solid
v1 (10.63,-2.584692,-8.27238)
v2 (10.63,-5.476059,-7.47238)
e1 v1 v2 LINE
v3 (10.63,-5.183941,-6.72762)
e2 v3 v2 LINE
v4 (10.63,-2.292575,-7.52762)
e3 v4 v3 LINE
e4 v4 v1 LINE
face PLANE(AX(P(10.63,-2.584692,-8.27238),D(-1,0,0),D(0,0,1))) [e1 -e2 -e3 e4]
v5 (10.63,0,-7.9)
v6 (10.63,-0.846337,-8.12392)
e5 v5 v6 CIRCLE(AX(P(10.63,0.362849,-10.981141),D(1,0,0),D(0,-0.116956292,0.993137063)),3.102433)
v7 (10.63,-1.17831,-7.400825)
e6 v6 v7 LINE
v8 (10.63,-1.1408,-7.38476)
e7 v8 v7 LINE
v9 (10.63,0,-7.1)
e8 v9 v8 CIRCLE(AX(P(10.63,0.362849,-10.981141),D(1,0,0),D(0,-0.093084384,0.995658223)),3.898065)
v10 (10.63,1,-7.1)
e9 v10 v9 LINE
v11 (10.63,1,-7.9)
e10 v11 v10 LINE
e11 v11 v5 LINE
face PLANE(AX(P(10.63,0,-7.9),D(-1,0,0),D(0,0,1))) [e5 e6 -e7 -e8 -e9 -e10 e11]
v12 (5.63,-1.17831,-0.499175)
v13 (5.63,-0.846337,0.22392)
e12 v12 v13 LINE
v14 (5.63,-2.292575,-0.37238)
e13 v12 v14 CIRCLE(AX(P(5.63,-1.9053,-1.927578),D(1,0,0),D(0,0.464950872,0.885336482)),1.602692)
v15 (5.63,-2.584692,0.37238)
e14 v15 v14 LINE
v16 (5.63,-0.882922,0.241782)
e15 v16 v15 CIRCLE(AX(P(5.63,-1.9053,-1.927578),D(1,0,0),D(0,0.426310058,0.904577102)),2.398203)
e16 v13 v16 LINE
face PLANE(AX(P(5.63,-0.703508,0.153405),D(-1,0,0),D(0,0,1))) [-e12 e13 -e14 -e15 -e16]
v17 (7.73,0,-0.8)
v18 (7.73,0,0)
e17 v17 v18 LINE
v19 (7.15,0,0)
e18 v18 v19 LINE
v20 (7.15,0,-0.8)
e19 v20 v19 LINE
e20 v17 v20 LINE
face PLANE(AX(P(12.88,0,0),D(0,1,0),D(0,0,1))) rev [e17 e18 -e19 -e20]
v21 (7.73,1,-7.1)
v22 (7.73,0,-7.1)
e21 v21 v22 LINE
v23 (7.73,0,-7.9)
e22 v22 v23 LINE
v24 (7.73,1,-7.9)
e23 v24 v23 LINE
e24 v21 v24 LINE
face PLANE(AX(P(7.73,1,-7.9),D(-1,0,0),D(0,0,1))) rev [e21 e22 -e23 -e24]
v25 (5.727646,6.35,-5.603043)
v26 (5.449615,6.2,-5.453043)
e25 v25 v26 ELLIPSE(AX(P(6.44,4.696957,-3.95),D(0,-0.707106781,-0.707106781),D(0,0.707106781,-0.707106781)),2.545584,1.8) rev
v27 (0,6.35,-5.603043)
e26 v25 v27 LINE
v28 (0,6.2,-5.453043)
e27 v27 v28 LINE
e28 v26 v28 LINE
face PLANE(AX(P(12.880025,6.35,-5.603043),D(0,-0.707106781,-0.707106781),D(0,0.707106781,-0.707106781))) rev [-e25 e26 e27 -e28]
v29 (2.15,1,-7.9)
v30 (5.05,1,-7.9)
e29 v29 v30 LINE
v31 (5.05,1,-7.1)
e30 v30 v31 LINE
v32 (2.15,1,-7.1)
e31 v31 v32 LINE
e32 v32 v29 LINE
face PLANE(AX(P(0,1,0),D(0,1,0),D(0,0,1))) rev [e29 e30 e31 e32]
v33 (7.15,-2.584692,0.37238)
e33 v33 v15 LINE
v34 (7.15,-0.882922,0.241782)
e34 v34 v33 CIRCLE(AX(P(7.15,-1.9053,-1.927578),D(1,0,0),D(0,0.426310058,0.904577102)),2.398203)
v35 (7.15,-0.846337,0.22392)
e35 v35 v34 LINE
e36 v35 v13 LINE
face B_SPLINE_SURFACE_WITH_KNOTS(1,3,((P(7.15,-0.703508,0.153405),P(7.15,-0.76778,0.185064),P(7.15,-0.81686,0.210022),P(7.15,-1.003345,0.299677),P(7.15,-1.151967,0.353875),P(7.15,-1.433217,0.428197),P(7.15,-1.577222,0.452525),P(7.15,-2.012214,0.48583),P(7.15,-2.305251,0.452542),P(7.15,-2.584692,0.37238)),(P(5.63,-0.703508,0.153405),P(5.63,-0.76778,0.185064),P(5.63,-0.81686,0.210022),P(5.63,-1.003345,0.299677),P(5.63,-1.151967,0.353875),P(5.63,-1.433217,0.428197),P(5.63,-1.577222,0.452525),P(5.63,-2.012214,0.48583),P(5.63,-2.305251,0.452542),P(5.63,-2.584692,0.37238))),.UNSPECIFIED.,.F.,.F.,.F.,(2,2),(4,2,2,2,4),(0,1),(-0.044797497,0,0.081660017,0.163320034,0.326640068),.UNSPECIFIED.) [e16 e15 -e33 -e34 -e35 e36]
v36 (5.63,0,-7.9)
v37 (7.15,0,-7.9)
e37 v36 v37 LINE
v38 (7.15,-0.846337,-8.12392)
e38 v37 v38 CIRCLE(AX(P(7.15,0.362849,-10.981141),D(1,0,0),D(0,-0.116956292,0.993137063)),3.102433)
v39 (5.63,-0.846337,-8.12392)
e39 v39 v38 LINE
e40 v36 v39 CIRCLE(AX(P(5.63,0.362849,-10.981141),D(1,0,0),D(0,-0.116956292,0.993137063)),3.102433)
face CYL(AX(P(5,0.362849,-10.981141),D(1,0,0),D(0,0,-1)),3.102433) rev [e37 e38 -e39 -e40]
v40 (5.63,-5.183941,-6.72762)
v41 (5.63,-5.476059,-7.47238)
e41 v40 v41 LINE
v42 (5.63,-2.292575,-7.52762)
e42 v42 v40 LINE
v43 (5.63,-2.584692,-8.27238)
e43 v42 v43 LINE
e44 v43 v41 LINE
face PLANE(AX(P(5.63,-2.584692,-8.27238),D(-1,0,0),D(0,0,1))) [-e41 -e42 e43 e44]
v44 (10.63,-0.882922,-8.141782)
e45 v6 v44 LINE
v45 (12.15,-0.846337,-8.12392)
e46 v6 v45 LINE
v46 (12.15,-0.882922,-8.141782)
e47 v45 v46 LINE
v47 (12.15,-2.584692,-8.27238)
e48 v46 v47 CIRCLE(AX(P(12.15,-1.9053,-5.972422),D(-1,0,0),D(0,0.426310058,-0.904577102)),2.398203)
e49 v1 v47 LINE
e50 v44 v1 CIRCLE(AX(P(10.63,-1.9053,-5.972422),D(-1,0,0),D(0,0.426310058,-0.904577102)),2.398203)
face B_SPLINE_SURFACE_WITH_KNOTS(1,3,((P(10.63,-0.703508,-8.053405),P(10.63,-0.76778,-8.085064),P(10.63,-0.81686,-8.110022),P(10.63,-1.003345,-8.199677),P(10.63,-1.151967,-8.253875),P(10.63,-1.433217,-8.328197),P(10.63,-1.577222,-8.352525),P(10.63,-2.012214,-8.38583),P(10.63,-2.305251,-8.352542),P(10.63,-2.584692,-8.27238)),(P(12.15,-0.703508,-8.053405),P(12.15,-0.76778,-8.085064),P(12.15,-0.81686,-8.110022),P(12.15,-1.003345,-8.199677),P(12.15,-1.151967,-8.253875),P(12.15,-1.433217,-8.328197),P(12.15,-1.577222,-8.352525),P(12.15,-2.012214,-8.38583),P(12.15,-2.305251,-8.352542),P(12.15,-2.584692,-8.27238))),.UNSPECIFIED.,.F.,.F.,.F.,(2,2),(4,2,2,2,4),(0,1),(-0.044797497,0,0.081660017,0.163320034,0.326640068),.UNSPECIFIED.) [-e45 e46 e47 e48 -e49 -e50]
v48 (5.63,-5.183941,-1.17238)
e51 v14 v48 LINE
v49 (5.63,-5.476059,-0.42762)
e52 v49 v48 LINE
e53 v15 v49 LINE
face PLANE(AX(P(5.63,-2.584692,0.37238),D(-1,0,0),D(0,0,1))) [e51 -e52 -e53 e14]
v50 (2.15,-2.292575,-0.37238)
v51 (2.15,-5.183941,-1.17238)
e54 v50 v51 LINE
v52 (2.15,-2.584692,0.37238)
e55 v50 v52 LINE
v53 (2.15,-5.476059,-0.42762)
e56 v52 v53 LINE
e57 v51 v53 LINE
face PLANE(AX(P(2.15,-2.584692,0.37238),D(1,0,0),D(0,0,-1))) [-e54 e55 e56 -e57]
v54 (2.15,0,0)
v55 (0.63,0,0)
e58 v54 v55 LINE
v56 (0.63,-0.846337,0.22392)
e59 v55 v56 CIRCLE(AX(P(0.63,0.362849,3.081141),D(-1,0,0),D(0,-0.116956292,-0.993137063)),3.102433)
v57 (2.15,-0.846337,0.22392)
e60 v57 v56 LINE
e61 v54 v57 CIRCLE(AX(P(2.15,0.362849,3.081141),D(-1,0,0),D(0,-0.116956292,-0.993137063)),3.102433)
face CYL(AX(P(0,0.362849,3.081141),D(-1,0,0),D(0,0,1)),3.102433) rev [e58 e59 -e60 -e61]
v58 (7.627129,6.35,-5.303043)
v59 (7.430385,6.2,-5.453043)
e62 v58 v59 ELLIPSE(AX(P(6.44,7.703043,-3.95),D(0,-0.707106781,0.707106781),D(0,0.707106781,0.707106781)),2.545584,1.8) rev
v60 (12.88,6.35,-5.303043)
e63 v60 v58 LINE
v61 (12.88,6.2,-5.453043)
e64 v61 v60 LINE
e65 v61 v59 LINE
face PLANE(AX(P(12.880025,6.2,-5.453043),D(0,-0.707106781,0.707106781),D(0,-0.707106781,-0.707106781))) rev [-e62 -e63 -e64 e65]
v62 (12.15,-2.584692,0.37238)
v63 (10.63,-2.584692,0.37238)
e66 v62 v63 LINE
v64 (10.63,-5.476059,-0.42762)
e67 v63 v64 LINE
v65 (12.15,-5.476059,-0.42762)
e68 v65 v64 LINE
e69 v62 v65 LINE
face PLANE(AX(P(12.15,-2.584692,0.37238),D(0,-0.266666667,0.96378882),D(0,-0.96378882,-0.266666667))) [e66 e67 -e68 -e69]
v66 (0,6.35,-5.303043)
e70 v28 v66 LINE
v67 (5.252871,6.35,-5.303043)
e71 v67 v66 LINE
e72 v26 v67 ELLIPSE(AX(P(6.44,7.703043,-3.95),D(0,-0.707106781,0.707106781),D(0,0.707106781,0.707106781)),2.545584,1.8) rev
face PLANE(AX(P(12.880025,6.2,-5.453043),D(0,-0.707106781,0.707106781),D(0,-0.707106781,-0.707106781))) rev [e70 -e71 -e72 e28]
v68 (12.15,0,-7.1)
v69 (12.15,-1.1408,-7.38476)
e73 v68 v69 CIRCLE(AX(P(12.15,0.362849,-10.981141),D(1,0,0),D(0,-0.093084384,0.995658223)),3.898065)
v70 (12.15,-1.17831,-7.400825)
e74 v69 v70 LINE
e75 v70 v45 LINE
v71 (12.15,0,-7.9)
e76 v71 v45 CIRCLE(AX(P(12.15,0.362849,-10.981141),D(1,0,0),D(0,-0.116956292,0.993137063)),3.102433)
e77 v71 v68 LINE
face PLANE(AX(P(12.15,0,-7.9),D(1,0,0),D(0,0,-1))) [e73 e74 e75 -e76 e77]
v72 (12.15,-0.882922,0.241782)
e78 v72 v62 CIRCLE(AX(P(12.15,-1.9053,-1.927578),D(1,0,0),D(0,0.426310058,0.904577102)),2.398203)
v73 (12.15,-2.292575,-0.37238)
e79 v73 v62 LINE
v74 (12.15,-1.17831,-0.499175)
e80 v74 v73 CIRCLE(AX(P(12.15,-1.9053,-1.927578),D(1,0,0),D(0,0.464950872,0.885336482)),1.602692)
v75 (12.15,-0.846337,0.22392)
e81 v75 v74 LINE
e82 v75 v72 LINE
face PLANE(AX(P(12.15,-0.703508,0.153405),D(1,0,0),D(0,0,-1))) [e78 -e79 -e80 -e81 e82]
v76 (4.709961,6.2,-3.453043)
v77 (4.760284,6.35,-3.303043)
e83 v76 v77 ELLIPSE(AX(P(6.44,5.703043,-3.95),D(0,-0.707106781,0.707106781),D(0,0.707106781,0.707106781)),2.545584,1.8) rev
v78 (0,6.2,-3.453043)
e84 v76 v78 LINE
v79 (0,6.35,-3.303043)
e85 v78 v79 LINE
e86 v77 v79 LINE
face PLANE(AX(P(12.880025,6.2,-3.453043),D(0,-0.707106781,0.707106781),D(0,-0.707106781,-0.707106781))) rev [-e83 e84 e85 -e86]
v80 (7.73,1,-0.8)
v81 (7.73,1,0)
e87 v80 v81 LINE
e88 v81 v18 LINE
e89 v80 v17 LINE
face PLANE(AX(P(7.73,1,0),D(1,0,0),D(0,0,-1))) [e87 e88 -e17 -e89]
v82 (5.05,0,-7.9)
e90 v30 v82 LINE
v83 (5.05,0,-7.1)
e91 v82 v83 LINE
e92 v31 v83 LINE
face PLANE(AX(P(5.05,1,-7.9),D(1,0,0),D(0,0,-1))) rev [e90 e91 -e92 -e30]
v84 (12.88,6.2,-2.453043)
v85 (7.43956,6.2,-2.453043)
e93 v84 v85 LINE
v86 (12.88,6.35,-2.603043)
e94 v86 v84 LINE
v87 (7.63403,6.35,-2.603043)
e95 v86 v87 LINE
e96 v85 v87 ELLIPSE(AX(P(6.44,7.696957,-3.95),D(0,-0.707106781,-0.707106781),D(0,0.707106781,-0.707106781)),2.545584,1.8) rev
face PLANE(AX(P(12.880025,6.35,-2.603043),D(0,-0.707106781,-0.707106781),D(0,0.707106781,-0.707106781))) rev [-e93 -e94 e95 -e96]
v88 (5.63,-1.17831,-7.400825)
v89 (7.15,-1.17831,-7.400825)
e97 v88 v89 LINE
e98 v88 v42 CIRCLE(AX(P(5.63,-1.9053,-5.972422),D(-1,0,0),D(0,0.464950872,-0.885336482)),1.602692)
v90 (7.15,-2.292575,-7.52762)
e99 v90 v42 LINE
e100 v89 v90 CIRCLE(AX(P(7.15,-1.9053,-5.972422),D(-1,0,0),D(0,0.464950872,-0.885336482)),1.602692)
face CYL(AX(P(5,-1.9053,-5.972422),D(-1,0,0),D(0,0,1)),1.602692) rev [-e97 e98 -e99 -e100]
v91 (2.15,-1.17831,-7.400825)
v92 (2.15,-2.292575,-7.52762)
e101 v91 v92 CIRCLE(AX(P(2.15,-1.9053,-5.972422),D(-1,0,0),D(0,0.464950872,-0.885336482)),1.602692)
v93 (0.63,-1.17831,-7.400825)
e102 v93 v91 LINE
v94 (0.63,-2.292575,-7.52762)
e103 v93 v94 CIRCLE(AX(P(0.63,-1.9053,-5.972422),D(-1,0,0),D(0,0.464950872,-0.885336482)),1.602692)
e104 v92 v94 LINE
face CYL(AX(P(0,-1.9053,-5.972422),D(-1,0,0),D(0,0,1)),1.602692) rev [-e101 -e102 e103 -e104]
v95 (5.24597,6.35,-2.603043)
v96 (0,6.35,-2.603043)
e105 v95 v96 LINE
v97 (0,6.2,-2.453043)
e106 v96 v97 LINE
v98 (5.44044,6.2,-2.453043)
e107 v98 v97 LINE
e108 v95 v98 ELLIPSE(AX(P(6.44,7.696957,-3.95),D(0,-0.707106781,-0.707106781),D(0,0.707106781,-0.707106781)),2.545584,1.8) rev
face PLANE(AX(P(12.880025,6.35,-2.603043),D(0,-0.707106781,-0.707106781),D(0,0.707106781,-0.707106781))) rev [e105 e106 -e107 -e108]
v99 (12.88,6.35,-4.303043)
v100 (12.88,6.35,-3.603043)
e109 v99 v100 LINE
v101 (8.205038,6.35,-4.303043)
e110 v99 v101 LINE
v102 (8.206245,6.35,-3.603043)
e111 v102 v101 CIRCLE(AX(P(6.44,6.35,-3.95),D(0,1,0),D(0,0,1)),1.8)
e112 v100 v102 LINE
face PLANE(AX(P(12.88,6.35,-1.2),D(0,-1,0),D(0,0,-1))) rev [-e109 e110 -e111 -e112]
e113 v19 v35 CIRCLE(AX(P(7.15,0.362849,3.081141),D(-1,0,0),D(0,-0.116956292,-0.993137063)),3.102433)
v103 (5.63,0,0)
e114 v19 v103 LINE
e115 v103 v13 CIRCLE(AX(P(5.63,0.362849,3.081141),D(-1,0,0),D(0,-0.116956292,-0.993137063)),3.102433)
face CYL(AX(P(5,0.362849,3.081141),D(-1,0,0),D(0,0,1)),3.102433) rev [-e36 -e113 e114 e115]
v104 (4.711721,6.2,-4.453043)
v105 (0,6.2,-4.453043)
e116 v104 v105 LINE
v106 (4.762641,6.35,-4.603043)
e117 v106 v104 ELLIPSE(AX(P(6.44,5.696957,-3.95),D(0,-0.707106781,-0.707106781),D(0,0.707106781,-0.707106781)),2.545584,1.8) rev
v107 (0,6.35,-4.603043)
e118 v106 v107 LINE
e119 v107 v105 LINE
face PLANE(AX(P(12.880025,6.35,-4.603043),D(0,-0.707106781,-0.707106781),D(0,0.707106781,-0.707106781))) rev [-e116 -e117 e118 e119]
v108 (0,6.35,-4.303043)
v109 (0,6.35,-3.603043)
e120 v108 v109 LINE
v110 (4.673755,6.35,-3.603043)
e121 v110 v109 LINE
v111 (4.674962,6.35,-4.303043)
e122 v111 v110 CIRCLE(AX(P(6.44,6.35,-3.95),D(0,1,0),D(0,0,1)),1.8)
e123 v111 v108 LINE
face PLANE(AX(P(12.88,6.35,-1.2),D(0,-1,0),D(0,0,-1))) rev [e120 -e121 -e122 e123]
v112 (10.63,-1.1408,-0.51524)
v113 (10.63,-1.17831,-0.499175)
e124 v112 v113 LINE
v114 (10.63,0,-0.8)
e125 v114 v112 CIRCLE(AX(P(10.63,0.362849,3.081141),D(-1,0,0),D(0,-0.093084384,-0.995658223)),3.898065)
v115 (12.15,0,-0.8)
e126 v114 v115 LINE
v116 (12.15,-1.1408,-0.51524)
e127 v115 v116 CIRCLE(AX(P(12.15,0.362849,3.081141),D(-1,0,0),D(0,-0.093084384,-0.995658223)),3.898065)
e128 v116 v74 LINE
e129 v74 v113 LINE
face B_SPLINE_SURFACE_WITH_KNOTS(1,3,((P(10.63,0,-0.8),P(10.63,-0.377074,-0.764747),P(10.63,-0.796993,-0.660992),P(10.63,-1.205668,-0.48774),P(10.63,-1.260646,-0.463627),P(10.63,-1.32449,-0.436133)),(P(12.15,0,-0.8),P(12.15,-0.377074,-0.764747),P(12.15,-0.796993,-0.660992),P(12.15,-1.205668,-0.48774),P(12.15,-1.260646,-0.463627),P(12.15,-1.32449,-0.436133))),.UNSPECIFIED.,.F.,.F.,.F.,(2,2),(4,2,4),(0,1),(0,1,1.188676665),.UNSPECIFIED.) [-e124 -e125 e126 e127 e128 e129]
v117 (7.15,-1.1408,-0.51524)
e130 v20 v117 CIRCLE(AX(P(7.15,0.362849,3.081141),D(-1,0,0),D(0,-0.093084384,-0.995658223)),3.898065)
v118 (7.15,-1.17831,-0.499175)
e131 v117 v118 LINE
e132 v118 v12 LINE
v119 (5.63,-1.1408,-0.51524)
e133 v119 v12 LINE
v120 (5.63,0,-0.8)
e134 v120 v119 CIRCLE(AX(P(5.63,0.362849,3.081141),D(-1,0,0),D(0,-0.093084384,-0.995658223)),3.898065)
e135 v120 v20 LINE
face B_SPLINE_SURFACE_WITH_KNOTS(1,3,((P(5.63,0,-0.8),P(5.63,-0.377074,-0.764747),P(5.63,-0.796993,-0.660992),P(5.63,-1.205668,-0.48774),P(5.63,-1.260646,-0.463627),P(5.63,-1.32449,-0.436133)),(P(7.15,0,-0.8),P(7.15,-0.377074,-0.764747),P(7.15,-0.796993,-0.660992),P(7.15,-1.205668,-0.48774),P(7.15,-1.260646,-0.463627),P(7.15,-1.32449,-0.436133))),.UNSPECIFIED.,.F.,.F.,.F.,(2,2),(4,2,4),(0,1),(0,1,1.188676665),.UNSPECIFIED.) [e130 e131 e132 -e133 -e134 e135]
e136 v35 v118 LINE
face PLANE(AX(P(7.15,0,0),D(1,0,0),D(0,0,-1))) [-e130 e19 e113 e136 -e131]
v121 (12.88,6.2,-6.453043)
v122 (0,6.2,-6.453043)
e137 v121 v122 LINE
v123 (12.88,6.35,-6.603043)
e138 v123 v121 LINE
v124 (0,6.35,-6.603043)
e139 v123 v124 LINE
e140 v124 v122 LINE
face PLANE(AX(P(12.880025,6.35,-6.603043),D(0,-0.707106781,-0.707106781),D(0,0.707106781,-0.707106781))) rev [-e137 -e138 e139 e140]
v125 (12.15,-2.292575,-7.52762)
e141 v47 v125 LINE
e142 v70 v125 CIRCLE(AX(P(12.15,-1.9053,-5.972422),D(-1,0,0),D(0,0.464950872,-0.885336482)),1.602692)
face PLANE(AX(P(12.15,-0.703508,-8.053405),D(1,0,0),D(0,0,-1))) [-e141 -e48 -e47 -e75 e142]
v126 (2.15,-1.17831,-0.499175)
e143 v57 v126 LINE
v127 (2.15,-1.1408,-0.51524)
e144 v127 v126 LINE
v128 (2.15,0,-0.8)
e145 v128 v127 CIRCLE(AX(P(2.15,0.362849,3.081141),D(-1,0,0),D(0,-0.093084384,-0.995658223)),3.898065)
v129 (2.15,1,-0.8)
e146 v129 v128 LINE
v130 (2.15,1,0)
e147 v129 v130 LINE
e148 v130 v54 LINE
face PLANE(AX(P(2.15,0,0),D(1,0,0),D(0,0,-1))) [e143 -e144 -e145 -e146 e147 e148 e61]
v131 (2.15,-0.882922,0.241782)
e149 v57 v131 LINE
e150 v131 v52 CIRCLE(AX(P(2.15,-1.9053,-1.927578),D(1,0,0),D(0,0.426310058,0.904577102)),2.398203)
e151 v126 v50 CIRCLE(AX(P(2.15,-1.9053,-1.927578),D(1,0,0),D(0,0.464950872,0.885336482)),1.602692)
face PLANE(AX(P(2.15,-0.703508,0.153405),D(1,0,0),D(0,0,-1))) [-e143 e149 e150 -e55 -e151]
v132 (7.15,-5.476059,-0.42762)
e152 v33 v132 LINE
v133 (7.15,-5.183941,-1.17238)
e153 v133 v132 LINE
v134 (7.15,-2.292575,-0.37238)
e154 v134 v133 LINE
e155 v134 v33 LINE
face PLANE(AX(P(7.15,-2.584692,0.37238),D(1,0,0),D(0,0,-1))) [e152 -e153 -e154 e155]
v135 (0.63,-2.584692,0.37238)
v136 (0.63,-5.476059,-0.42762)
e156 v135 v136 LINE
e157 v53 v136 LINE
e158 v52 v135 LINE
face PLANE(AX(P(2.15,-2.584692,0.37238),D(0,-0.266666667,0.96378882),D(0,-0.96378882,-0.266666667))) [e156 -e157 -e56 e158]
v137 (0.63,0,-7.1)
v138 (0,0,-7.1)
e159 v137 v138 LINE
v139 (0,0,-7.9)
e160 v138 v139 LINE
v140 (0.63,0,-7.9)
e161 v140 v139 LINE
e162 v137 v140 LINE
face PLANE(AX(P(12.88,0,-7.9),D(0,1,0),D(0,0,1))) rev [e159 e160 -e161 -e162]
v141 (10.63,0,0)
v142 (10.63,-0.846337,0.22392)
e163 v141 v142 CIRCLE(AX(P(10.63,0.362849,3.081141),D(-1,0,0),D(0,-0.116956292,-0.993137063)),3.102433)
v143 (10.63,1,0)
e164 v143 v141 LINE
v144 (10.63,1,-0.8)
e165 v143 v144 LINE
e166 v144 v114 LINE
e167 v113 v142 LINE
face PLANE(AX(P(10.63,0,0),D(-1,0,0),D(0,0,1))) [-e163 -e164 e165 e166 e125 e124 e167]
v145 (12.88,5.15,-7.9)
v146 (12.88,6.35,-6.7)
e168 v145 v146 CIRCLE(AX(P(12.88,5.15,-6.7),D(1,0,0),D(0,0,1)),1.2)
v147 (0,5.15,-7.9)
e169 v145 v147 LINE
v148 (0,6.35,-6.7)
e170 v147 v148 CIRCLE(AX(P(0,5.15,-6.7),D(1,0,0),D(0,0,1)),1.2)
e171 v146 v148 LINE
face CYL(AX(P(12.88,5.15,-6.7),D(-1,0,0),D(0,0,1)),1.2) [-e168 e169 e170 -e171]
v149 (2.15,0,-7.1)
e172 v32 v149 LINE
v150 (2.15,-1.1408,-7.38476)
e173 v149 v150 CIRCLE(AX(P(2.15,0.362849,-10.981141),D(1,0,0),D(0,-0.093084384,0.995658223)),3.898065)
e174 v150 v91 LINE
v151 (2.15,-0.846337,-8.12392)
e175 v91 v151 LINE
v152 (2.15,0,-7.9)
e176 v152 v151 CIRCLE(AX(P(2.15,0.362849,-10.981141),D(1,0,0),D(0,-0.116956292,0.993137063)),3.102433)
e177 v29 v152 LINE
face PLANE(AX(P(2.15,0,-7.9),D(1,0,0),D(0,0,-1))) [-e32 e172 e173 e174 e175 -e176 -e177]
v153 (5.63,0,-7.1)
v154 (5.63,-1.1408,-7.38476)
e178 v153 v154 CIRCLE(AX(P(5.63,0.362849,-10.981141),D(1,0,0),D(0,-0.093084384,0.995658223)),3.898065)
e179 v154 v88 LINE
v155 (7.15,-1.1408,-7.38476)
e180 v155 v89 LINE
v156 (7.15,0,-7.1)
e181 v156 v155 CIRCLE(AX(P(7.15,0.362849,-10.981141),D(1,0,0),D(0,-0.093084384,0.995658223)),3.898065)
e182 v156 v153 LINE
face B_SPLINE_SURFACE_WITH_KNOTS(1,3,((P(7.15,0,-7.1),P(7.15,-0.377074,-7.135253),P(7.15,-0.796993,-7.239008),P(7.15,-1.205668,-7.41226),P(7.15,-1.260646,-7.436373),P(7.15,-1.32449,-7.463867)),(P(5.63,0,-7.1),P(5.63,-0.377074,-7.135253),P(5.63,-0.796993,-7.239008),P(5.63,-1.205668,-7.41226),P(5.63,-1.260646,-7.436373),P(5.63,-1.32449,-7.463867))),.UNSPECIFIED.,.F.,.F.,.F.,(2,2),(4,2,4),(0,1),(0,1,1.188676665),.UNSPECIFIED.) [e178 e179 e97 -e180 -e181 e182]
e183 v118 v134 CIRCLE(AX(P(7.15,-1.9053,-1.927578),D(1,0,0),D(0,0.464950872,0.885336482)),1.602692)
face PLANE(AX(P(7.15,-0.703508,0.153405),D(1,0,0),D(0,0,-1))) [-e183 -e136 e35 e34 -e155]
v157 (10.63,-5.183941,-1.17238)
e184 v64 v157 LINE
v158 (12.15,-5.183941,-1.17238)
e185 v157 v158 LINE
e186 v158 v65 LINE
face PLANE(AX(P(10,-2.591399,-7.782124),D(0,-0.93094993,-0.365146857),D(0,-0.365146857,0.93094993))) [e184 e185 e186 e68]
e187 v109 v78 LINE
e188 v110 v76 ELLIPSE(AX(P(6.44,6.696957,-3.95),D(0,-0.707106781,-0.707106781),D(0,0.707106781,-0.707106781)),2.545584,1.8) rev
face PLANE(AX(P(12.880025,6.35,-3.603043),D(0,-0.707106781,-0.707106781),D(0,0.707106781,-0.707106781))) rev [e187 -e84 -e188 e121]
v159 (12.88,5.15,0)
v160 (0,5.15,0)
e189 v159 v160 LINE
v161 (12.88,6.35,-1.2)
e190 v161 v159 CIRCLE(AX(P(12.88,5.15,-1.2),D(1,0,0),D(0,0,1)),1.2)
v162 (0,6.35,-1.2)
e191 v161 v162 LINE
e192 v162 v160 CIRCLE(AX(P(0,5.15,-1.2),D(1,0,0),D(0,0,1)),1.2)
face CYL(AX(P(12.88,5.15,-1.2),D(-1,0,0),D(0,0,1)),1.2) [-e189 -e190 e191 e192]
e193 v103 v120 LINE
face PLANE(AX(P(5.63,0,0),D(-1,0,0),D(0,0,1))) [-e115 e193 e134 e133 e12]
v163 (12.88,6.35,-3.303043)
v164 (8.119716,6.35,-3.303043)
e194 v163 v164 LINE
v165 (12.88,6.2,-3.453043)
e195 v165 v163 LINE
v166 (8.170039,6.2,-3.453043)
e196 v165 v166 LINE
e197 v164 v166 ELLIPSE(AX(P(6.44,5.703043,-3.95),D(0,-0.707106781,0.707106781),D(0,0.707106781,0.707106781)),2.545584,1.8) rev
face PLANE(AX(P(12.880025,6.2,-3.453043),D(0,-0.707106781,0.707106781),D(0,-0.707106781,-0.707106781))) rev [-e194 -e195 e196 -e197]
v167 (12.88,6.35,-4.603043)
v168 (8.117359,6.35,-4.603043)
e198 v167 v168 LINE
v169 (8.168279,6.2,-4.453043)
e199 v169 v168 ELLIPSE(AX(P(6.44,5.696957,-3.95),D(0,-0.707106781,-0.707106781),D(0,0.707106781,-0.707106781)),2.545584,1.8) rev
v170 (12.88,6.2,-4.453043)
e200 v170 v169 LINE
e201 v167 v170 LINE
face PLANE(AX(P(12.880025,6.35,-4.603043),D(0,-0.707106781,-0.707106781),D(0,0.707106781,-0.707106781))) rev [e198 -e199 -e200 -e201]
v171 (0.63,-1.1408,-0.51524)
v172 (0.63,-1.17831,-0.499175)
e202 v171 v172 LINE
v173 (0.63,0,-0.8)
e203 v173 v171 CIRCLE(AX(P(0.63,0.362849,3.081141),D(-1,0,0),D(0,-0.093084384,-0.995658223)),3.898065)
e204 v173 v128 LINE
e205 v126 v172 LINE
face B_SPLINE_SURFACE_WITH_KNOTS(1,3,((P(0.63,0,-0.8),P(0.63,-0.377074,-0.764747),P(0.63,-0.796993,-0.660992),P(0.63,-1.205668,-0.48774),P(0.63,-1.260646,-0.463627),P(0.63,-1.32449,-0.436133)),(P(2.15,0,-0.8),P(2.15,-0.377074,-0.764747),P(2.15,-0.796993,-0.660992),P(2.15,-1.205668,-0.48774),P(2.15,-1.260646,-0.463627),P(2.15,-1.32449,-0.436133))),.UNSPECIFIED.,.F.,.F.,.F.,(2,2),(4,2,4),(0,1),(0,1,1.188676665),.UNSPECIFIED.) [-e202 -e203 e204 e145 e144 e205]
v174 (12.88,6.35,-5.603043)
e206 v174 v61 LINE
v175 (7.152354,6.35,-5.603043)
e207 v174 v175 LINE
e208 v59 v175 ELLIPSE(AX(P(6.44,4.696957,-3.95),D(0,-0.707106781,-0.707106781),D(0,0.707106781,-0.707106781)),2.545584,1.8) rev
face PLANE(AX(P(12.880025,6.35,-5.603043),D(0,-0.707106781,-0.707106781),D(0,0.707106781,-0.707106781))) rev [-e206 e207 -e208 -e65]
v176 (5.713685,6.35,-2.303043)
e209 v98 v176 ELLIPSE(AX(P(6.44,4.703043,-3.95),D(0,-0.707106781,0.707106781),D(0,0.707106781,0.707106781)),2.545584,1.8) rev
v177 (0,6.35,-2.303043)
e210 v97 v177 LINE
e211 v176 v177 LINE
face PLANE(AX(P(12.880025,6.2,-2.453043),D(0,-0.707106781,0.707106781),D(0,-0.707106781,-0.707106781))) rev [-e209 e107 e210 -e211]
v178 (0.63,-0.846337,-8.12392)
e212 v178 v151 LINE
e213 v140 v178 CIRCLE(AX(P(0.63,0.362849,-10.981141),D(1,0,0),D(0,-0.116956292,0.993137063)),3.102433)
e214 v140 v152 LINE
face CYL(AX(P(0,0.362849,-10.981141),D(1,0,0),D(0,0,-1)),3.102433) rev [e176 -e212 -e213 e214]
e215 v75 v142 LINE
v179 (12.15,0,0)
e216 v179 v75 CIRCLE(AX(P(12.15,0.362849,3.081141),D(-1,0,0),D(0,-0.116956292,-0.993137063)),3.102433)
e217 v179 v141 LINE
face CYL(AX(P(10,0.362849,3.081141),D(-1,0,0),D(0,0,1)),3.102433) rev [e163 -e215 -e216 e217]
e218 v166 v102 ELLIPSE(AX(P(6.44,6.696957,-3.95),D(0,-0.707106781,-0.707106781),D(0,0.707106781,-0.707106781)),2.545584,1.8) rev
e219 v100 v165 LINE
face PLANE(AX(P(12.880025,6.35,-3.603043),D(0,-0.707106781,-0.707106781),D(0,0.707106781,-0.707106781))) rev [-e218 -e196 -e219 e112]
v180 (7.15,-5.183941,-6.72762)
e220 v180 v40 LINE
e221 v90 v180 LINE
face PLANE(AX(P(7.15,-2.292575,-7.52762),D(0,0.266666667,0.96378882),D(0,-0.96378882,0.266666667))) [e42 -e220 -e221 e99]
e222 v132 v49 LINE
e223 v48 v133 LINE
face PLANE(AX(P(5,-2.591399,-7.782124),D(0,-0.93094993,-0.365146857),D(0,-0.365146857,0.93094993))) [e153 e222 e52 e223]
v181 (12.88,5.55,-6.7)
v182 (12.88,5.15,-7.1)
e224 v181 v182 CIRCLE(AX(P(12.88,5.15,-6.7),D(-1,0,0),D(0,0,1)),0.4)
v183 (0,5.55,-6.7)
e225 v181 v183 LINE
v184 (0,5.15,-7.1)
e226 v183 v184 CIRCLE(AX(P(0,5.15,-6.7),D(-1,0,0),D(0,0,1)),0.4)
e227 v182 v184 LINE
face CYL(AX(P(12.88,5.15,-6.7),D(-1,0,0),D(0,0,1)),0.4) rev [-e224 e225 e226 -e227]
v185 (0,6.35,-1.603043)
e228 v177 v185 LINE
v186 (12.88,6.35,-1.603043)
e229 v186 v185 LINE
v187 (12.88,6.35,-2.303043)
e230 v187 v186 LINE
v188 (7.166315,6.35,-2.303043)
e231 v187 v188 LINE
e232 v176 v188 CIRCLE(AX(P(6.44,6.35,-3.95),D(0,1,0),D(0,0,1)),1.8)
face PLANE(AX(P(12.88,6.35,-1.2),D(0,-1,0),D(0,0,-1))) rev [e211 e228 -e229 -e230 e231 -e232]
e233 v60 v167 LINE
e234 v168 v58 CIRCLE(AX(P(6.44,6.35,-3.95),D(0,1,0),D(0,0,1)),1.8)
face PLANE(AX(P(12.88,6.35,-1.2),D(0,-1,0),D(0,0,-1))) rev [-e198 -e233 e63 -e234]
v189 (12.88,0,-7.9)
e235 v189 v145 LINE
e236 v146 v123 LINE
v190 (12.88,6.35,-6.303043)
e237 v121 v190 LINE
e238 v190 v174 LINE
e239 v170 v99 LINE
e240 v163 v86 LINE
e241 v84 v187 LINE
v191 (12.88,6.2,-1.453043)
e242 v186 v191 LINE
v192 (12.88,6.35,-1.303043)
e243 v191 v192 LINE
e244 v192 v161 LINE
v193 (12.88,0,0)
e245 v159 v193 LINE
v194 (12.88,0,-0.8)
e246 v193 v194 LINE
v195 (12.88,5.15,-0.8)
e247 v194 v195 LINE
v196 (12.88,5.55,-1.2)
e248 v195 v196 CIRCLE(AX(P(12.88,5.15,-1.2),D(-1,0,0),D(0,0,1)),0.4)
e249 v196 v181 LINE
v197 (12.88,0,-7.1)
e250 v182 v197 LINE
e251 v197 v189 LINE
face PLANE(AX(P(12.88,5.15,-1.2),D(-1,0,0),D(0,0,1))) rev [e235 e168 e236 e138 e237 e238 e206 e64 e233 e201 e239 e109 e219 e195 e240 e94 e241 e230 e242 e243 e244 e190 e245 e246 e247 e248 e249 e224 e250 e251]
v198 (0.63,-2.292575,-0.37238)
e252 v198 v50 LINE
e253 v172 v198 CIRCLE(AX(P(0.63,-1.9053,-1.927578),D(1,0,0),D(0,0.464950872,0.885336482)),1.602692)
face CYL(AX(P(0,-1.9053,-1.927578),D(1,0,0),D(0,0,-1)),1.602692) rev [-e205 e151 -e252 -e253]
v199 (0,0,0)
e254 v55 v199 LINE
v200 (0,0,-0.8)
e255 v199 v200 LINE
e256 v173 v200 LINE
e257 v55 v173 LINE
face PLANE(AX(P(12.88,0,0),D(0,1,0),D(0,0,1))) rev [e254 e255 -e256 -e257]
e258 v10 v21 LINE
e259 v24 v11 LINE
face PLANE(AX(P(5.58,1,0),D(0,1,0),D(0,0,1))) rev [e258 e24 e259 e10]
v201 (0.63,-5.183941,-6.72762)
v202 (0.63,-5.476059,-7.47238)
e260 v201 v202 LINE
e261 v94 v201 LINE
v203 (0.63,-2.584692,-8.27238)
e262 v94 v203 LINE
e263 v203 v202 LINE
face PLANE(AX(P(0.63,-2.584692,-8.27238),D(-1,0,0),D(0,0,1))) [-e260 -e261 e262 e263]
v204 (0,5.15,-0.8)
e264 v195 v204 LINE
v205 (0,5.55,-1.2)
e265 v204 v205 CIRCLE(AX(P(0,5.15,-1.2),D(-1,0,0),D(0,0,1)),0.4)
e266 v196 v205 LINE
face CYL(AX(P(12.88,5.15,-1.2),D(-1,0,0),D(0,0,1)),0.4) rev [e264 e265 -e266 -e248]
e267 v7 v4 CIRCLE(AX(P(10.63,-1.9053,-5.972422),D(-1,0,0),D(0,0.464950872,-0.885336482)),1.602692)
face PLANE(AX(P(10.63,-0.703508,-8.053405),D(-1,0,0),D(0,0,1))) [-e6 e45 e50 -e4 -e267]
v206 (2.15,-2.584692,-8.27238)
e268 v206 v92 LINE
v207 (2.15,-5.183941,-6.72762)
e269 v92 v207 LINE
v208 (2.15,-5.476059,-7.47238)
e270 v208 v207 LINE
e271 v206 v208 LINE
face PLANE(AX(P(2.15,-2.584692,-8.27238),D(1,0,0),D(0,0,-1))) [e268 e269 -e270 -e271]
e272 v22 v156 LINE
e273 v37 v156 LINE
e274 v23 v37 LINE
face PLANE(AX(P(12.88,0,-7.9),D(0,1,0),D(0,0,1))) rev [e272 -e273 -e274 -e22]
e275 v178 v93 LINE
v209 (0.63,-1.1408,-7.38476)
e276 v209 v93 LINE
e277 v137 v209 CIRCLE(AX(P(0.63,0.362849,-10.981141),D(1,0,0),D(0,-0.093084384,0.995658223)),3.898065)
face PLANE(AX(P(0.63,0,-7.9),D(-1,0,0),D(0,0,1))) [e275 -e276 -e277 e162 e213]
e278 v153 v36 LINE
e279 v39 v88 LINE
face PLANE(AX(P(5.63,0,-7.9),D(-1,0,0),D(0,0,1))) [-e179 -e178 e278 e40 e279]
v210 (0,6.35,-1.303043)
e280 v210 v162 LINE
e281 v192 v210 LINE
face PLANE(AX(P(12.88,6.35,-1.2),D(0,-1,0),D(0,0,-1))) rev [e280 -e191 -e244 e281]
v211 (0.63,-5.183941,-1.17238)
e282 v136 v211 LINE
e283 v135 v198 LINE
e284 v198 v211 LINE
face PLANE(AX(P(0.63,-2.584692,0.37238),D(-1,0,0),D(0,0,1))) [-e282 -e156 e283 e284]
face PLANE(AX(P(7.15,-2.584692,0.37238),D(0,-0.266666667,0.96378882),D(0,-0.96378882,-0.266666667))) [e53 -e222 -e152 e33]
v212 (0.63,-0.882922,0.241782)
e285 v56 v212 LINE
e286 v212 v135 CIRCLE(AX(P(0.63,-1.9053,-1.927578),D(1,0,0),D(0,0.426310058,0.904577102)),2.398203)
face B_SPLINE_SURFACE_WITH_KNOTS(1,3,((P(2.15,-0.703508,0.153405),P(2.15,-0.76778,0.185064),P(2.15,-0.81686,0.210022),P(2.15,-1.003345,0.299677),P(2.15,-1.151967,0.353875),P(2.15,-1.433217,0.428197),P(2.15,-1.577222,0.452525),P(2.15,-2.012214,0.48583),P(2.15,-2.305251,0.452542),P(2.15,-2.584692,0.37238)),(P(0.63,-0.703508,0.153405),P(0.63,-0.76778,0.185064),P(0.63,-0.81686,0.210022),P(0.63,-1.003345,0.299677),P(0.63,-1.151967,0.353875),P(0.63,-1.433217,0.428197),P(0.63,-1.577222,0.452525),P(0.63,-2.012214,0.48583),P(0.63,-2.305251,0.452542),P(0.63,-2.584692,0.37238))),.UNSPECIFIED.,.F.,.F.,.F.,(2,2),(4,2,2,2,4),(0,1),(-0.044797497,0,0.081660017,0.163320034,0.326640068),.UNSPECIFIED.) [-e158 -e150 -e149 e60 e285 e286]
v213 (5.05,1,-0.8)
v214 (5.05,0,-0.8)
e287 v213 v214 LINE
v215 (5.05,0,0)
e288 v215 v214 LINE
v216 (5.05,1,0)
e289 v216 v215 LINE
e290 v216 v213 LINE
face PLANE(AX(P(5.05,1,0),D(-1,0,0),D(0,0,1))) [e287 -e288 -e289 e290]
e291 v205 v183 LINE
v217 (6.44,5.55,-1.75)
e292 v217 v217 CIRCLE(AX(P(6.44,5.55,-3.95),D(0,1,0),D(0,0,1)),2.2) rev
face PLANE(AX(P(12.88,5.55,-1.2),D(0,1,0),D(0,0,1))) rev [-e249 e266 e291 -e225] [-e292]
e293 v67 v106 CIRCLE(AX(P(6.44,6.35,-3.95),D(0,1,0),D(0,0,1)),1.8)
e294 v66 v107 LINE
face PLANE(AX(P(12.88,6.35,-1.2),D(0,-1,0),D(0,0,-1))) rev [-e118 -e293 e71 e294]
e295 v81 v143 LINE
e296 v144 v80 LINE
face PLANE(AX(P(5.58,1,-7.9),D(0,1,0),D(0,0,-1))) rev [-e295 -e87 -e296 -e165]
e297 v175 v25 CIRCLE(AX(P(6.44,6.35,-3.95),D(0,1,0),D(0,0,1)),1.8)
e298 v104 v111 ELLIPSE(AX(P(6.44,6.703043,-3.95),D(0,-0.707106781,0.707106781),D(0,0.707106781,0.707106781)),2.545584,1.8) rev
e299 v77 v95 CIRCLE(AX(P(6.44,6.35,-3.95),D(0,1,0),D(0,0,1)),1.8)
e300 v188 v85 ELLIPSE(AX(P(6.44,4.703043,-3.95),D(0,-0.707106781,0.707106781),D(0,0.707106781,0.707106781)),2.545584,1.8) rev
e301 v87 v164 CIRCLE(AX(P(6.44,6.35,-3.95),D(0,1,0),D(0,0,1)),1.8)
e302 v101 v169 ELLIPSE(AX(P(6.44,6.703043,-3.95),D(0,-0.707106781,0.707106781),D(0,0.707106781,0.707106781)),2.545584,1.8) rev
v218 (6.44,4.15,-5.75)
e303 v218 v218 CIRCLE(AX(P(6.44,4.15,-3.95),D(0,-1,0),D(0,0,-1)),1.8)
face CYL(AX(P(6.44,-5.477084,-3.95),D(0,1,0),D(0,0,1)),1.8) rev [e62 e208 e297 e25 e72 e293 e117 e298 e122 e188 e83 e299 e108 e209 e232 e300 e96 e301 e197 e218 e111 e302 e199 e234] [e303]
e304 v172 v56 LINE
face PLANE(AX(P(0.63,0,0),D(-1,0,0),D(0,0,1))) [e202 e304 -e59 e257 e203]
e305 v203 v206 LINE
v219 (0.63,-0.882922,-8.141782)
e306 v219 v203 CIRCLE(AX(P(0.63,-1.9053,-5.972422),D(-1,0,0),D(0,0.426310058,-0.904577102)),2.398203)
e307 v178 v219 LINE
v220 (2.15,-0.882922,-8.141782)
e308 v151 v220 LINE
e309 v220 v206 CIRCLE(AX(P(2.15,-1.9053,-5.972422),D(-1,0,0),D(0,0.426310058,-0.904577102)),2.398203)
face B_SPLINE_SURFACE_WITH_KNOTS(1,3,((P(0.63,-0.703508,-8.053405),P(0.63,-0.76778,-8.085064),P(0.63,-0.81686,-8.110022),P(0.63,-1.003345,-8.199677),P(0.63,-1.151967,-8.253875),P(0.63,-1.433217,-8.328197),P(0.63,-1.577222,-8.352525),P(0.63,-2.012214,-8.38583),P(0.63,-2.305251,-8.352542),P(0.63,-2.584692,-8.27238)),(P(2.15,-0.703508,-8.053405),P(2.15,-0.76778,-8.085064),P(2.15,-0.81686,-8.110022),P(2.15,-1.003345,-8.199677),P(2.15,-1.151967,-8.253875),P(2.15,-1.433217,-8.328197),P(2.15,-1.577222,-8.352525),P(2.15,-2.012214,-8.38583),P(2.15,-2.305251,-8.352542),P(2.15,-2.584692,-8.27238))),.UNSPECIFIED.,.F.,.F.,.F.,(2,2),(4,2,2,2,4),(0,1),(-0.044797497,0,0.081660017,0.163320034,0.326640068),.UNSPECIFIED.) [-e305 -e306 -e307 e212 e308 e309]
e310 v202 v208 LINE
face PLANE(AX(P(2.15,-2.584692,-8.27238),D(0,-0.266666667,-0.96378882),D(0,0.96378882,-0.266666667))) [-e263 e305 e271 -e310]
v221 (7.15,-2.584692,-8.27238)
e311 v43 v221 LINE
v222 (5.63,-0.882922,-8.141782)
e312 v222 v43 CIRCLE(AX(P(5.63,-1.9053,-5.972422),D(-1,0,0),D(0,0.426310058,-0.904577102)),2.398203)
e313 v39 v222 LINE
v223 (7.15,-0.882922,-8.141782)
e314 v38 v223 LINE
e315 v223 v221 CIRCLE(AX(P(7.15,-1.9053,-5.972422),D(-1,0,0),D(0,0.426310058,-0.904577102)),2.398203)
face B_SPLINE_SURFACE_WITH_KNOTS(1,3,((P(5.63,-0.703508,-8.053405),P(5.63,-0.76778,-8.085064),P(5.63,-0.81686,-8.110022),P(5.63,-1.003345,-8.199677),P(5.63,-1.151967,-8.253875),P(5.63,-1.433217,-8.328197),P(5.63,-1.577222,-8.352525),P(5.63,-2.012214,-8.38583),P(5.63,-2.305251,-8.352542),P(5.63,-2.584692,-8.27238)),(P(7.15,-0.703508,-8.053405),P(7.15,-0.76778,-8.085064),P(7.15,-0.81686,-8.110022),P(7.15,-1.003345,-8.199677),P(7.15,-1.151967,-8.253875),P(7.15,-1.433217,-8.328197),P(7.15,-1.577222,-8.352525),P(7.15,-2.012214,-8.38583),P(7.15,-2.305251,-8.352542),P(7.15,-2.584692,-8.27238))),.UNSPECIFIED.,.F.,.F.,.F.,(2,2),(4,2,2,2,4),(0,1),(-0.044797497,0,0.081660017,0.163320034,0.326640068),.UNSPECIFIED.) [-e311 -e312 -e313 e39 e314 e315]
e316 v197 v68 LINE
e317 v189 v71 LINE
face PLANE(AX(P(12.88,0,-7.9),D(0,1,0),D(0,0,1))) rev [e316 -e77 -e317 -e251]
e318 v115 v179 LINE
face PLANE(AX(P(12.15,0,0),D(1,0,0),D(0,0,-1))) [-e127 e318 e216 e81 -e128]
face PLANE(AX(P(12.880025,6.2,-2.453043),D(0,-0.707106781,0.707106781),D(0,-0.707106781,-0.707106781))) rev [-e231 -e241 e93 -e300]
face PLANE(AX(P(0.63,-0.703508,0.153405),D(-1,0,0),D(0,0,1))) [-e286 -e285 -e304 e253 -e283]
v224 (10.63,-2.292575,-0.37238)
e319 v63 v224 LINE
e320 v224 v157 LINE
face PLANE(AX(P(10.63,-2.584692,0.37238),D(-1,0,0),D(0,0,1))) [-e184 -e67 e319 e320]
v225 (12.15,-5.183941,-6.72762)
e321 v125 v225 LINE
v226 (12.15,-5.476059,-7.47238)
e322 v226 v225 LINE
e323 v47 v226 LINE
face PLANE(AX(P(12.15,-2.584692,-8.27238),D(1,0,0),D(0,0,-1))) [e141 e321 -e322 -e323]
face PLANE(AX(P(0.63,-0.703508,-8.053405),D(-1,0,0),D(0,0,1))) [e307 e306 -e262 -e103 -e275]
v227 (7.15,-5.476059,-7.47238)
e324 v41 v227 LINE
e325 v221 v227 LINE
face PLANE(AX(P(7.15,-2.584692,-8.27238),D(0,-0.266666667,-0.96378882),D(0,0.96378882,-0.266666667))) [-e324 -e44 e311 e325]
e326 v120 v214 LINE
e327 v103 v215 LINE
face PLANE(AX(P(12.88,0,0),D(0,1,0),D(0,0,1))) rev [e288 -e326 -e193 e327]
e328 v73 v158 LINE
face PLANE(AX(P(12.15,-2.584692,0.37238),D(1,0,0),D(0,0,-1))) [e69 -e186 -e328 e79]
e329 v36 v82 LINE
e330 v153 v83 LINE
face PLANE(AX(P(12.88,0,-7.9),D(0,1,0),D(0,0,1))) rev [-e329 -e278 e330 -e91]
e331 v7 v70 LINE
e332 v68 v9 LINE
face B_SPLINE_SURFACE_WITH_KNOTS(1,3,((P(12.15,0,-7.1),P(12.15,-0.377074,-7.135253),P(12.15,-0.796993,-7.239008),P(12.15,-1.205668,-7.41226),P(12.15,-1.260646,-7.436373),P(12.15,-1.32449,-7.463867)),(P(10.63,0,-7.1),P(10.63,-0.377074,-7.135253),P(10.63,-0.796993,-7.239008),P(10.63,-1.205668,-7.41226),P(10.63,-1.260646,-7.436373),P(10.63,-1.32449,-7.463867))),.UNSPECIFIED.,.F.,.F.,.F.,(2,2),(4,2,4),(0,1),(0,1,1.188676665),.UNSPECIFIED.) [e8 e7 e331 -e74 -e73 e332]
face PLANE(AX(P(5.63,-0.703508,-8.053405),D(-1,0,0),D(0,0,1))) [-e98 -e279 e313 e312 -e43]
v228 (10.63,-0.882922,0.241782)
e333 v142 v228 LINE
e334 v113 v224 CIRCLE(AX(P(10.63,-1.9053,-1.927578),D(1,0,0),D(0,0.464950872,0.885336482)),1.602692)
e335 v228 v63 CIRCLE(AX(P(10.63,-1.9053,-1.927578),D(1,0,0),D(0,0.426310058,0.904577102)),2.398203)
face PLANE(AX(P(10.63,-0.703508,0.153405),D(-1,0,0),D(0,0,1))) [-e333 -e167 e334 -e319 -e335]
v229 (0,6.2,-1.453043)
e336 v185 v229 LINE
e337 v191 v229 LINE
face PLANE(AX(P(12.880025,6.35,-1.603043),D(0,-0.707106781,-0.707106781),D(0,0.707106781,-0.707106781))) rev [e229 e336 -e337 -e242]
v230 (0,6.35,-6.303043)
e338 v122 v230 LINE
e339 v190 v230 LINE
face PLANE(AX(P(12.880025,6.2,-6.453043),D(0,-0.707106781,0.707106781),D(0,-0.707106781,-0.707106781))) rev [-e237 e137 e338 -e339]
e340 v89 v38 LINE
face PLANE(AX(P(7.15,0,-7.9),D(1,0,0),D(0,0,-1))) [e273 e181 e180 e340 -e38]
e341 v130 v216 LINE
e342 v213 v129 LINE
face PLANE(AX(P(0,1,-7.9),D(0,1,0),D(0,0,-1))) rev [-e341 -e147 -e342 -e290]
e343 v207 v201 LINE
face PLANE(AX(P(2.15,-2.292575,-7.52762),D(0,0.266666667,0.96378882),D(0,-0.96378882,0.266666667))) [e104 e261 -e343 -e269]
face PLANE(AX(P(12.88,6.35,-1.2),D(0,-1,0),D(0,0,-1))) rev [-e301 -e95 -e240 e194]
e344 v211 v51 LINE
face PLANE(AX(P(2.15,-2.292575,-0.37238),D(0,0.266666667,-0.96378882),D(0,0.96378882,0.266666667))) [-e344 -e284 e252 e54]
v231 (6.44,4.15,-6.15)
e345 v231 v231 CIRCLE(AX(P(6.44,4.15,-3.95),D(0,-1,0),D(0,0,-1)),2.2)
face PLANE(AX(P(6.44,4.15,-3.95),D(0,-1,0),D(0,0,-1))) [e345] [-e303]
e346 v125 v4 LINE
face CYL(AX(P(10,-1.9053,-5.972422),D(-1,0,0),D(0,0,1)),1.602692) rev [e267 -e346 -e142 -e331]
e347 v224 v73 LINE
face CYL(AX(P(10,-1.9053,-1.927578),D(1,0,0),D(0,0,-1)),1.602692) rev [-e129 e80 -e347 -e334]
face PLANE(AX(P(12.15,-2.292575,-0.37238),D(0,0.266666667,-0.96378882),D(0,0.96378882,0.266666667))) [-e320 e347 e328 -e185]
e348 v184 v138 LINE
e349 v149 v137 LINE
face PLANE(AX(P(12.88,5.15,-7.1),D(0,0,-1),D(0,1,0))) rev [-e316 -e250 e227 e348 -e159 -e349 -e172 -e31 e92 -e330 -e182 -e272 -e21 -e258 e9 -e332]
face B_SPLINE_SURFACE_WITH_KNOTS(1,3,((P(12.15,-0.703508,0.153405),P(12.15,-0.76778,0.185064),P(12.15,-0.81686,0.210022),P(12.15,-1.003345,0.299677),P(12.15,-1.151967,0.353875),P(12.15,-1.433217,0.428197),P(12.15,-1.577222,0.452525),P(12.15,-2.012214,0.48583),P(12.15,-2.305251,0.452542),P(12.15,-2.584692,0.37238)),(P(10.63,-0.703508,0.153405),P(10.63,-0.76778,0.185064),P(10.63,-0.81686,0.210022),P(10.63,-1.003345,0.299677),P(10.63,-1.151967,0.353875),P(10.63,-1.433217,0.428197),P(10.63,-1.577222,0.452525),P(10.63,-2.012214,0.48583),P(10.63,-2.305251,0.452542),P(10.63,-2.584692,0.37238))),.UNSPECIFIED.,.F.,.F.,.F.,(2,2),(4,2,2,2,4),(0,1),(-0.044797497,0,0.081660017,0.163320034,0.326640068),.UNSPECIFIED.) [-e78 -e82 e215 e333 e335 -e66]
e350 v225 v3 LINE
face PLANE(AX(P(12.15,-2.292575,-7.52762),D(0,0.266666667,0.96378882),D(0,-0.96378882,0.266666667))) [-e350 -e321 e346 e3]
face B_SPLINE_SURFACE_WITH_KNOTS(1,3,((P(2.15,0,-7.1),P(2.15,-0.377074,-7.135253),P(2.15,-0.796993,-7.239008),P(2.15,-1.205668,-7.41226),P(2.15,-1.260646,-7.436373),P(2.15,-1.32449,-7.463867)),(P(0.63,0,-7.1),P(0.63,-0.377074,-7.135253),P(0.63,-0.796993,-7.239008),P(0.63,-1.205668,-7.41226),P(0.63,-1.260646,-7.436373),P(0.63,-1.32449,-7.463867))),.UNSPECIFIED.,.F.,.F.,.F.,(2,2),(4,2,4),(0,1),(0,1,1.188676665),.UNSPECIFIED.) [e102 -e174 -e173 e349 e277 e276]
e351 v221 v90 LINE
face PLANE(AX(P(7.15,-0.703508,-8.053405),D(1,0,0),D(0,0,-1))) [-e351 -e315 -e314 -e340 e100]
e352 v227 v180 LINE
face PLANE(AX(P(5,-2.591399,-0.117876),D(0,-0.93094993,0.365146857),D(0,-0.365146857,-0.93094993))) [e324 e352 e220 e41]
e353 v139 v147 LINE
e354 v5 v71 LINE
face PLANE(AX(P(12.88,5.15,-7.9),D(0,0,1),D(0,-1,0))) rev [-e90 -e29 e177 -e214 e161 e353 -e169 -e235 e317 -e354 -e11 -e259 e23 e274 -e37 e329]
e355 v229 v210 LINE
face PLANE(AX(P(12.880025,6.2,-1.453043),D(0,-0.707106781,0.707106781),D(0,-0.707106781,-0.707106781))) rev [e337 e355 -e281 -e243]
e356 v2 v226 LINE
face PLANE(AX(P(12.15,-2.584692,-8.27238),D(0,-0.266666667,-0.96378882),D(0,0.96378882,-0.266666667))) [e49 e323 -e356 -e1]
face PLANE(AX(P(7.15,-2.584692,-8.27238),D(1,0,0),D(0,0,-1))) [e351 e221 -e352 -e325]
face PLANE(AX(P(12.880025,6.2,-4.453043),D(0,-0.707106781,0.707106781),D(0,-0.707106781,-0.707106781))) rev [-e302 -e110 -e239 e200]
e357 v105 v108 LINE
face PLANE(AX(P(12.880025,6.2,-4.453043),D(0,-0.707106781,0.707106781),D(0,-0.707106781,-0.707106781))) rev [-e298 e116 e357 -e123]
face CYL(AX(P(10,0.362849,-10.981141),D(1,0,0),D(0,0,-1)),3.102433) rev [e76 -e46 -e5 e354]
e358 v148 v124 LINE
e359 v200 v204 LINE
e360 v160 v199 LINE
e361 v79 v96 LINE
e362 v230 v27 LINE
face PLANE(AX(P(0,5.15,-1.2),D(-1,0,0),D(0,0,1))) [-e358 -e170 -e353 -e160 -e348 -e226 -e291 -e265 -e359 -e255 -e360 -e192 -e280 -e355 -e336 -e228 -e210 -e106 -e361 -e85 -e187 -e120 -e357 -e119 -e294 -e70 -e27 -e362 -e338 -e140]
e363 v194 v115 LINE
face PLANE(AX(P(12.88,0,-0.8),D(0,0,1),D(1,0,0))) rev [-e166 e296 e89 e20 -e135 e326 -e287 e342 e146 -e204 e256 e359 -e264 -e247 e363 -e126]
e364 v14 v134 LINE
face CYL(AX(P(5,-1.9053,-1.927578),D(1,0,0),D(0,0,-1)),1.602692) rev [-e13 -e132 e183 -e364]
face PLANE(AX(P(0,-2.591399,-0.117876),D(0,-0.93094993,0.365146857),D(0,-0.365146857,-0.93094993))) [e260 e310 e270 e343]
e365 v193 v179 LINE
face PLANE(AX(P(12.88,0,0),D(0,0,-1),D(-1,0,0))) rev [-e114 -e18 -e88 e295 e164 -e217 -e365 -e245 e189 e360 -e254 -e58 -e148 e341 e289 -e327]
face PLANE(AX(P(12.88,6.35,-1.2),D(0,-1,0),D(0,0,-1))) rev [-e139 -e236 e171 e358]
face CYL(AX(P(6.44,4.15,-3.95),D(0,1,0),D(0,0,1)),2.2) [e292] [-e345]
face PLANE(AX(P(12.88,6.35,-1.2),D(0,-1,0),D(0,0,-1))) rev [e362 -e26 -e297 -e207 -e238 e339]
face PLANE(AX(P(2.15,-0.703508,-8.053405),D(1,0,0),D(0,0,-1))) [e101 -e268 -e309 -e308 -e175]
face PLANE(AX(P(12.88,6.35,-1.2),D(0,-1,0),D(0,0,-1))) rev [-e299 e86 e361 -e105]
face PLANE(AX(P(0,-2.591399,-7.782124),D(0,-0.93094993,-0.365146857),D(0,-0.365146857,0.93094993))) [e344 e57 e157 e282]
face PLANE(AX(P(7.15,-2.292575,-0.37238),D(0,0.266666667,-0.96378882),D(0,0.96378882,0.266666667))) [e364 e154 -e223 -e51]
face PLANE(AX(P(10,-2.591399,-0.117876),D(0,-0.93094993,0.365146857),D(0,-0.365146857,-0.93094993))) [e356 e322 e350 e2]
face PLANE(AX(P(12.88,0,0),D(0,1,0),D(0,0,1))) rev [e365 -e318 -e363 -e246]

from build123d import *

# Parameters (mm, degrees)
BOSS_EXTRUDE1_DEPTH     = 12.88
SWEEP1_START            = 0.63
SWEEP1_DEPTH            = 1.52
LPATTERN1_COUNT         = 3
LPATTERN1_PITCH         = 5
SKETCH5_W               = 2.9
SKETCH5_H               = 0.8
CUT_EXTRUDE1_DEPTH      = 1
LPATTERN2_COUNT         = 2
LPATTERN2_PITCH         = 5.58
MIRROR1_START           = 0.63
MIRROR1_COPY_1_DEPTH    = 1.52
MIRROR1_COPY_2_DEPTH    = 1.52
MIRROR1_COPY_3_SKETCH_W = 2.9
MIRROR1_COPY_3_SKETCH_H = 0.8
MIRROR1_COPY_3_DEPTH    = 1
CUT_EXTRUDE2_REACH      = 21.386
SKETCH6_R               = 1.8
SKETCH7_R               = 2.2
SKETCH7_R_2             = 1.8
BOSS_EXTRUDE2_DEPTH     = 1.4
CUT_EXTRUDE3_DEPTH      = 17.621667755


# Read off the part's stored shape, not the designer's step: Sweep1
with BuildPart() as part:
    # Sketch1 → Boss-Extrude1 (new body)
    with BuildSketch(Plane(origin=(0, 0, 0), x_dir=(0, 0, -1), z_dir=(1, 0, 0))):
        with BuildLine():
            Line((0, 0), (0, 5.15))
            ThreePointArc((0, 5.15), (0.351471863, 5.998528137), (1.2, 6.35))
            Line((1.2, 6.35), (6.7, 6.35))
            ThreePointArc((6.7, 6.35), (7.548528137, 5.998528137), (7.9, 5.15))
            Line((7.9, 5.15), (7.9, 0))
            Line((7.9, 0), (7.1, 0))
            Line((7.1, 0), (7.1, 5.15))
            ThreePointArc((7.1, 5.15), (6.982842712, 5.432842712), (6.7, 5.55))
            Line((6.7, 5.55), (1.2, 5.55))
            ThreePointArc((1.2, 5.55), (0.917157288, 5.432842712), (0.8, 5.15))
            Line((0.8, 5.15), (0.8, 0))
            Line((0.8, 0), (0, 0))
        make_face()
    extrude(amount=BOSS_EXTRUDE1_DEPTH)

    # Sweep1 outline → Sweep1 (add)
    with BuildSketch(Plane.YZ.offset(SWEEP1_START)):
        with BuildLine():
            add(Edge.make_bspline(
                [(-0.846283759, -8.124029358), (-0.858016898, -8.129757785), (-0.870152204, -8.135642842), (-1.003345202, -8.19967658), (-1.15196737, -8.253874655), (-1.433217357, -8.328196696), (-1.577221625, -8.352525408), (-2.012213537, -8.385830326), (-2.305250753, -8.352541538), (-2.584692284, -8.272379972)],
                knots=[-0.008659355, -0.008659355, -0.008659355, -0.008659355, 0, 0, 0.081660017, 0.081660017, 0.163320034, 0.163320034, 0.326640068, 0.326640068, 0.326640068, 0.326640068], degree=3))
            ThreePointArc((-0.846283759, -8.124029358), (-0.431086788, -7.982015265), (0, -7.9))
            Line((0, -7.9), (0, -7.1))
            add(Edge.make_bspline(
                [(0, -7.1), (-0.377073857, -7.135252748), (-0.796992874, -7.239007705), (-1.153651992, -7.390208706), (-1.166116228, -7.395524363), (-1.178338095, -7.400759688)],
                knots=[0, 0, 0, 0, 1, 1, 1.037382886, 1.037382886, 1.037382886, 1.037382886], degree=3))
            ThreePointArc((-1.178338095, -7.400759688), (-1.724000867, -7.564826814), (-2.292574798, -7.527620028))
            Line((-2.292574798, -7.527620028), (-5.183941257, -6.727620028))
            Line((-5.183941257, -6.727620028), (-5.476058743, -7.472379972))
            Line((-5.476058743, -7.472379972), (-2.584692284, -8.272379972))
        make_face()
    sweep1 = extrude(amount=SWEEP1_DEPTH)

    # LPattern1: Sweep1 ×3
    with Locations(*[(i * LPATTERN1_PITCH, 0, 0) for i in range(1, LPATTERN1_COUNT)]):
        add(sweep1)

    # Sketch5 → Cut-Extrude1 (cut)
    with BuildSketch(Plane.XZ):
        with Locations((3.6, -7.5)):
            Rectangle(SKETCH5_W, SKETCH5_H)
    cut_extrude1 = extrude(amount=-CUT_EXTRUDE1_DEPTH, mode=Mode.SUBTRACT)

    # LPattern2: Cut-Extrude1 ×2
    with Locations(*[(i * LPATTERN2_PITCH, 0, 0) for i in range(1, LPATTERN2_COUNT)]):
        add(cut_extrude1, mode=Mode.SUBTRACT)

    # Mirror1: Sweep1, Cut-Extrude1 across plane
    add(sweep1.mirror(Plane(origin=(0, 0, -3.95), x_dir=(1, 0, 0), z_dir=(0, 0, -1))))
    add(cut_extrude1.mirror(Plane(origin=(0, 0, -3.95), x_dir=(1, 0, 0), z_dir=(0, 0, -1))), mode=Mode.SUBTRACT)

    # Mirror1 copy 1 sketch → Mirror1 copy 1 (add)
    with BuildSketch(Plane(origin=(5, 0, -7.9), x_dir=(0, 1, 0), z_dir=(1, 0, 0)).offset(MIRROR1_START)):
        with BuildLine():
            add(Edge.make_bspline(
                [(-0.846283759, 8.124029358), (-0.858016898, 8.129757785), (-0.870152204, 8.135642842), (-1.003345202, 8.19967658), (-1.15196737, 8.253874655), (-1.433217357, 8.328196696), (-1.577221625, 8.352525408), (-2.012213537, 8.385830326), (-2.305250753, 8.352541538), (-2.584692284, 8.272379972)],
                knots=[-0.008659355, -0.008659355, -0.008659355, -0.008659355, 0, 0, 0.081660017, 0.081660017, 0.163320034, 0.163320034, 0.326640068, 0.326640068, 0.326640068, 0.326640068], degree=3))
            ThreePointArc((-0.846283759, 8.124029358), (-0.431086788, 7.982015265), (0, 7.9))
            Line((0, 7.9), (0, 7.1))
            add(Edge.make_bspline(
                [(0, 7.1), (-0.377073857, 7.135252748), (-0.796992874, 7.239007705), (-1.153651992, 7.390208706), (-1.166116228, 7.395524363), (-1.178338095, 7.400759688)],
                knots=[0, 0, 0, 0, 1, 1, 1.037382886, 1.037382886, 1.037382886, 1.037382886], degree=3))
            ThreePointArc((-1.178338095, 7.400759688), (-1.724000867, 7.564826814), (-2.292574798, 7.527620028))
            Line((-2.292574798, 7.527620028), (-5.183941257, 6.727620028))
            Line((-5.183941257, 6.727620028), (-5.476058743, 7.472379972))
            Line((-5.476058743, 7.472379972), (-2.584692284, 8.272379972))
        make_face()
    extrude(amount=MIRROR1_COPY_1_DEPTH)

    # Mirror1 copy 2 sketch → Mirror1 copy 2 (add)
    with BuildSketch(Plane(origin=(10, 0, -7.9), x_dir=(0, 1, 0), z_dir=(1, 0, 0)).offset(MIRROR1_START)):
        with BuildLine():
            add(Edge.make_bspline(
                [(-0.846283759, 8.124029358), (-0.858016898, 8.129757785), (-0.870152204, 8.135642842), (-1.003345202, 8.19967658), (-1.15196737, 8.253874655), (-1.433217357, 8.328196696), (-1.577221625, 8.352525408), (-2.012213537, 8.385830326), (-2.305250753, 8.352541538), (-2.584692284, 8.272379972)],
                knots=[-0.008659355, -0.008659355, -0.008659355, -0.008659355, 0, 0, 0.081660017, 0.081660017, 0.163320034, 0.163320034, 0.326640068, 0.326640068, 0.326640068, 0.326640068], degree=3))
            ThreePointArc((-0.846283759, 8.124029358), (-0.431086788, 7.982015265), (0, 7.9))
            Line((0, 7.9), (0, 7.1))
            add(Edge.make_bspline(
                [(0, 7.1), (-0.377073857, 7.135252748), (-0.796992874, 7.239007705), (-1.153651992, 7.390208706), (-1.166116228, 7.395524363), (-1.178338095, 7.400759688)],
                knots=[0, 0, 0, 0, 1, 1, 1.037382886, 1.037382886, 1.037382886, 1.037382886], degree=3))
            ThreePointArc((-1.178338095, 7.400759688), (-1.724000867, 7.564826814), (-2.292574798, 7.527620028))
            Line((-2.292574798, 7.527620028), (-5.183941257, 6.727620028))
            Line((-5.183941257, 6.727620028), (-5.476058743, 7.472379972))
            Line((-5.476058743, 7.472379972), (-2.584692284, 8.272379972))
        make_face()
    extrude(amount=MIRROR1_COPY_2_DEPTH)

    # Mirror1 copy 3 sketch → Mirror1 copy 3 (cut)
    with BuildSketch(Plane(origin=(5.58, 0, -7.9), x_dir=(1, 0, 0), z_dir=(0, -1, 0))):
        with Locations((3.6, 7.5)):
            Rectangle(MIRROR1_COPY_3_SKETCH_W, MIRROR1_COPY_3_SKETCH_H)
    extrude(amount=-MIRROR1_COPY_3_DEPTH, mode=Mode.SUBTRACT)

    # Sketch6 → Cut-Extrude2 (cut, up to next)
    with BuildSketch(Plane(origin=(0, 6.35, 0), x_dir=(1, 0, 0), z_dir=(0, 1, 0)), mode=Mode.PRIVATE) as cut_extrude2_sk1:
        with Locations(Location((6.44, 3.95, 0), (0, 0, 270))):
            Circle(SKETCH6_R)
    cut_extrude2_tool1 = extrude(cut_extrude2_sk1.sketch, amount=-CUT_EXTRUDE2_REACH, mode=Mode.PRIVATE) & part.part
    add(cut_extrude2_tool1.solids().sort_by_distance((6.44, 6.35, -3.95))[0], mode=Mode.SUBTRACT)

    # Sketch7 → Boss-Extrude2 (add)
    with BuildSketch(Plane.XZ.offset(-5.55)):
        with Locations(Location((6.44, -3.95, 0), (0, 0, 90))):
            Circle(SKETCH7_R)
        with Locations(Location((6.44, -3.95, 0), (0, 0, 90))):
            Circle(SKETCH7_R_2, mode=Mode.SUBTRACT)
    extrude(amount=BOSS_EXTRUDE2_DEPTH)

    # Sketch8 → Cut-Extrude3 (cut, through all)
    with BuildSketch(Plane.ZY):
        Polygon((-6.603043073, 6.35), (-6.453043073, 6.2), (-6.303043073, 6.35), align=None)
        Polygon((-5.303043073, 6.35), (-5.603043073, 6.35), (-5.453043073, 6.2), align=None)
        Polygon((-4.303043073, 6.35), (-4.603043073, 6.35), (-4.453043073, 6.2), align=None)
        Polygon((-3.303043073, 6.35), (-3.603043073, 6.35), (-3.453043073, 6.2), align=None)
        Polygon((-2.303043073, 6.35), (-2.603043073, 6.35), (-2.453043073, 6.2), align=None)
        Polygon((-1.303043073, 6.35), (-1.603043073, 6.35), (-1.453043073, 6.2), align=None)
    extrude(amount=-CUT_EXTRUDE3_DEPTH, mode=Mode.SUBTRACT)


solid = part.part
